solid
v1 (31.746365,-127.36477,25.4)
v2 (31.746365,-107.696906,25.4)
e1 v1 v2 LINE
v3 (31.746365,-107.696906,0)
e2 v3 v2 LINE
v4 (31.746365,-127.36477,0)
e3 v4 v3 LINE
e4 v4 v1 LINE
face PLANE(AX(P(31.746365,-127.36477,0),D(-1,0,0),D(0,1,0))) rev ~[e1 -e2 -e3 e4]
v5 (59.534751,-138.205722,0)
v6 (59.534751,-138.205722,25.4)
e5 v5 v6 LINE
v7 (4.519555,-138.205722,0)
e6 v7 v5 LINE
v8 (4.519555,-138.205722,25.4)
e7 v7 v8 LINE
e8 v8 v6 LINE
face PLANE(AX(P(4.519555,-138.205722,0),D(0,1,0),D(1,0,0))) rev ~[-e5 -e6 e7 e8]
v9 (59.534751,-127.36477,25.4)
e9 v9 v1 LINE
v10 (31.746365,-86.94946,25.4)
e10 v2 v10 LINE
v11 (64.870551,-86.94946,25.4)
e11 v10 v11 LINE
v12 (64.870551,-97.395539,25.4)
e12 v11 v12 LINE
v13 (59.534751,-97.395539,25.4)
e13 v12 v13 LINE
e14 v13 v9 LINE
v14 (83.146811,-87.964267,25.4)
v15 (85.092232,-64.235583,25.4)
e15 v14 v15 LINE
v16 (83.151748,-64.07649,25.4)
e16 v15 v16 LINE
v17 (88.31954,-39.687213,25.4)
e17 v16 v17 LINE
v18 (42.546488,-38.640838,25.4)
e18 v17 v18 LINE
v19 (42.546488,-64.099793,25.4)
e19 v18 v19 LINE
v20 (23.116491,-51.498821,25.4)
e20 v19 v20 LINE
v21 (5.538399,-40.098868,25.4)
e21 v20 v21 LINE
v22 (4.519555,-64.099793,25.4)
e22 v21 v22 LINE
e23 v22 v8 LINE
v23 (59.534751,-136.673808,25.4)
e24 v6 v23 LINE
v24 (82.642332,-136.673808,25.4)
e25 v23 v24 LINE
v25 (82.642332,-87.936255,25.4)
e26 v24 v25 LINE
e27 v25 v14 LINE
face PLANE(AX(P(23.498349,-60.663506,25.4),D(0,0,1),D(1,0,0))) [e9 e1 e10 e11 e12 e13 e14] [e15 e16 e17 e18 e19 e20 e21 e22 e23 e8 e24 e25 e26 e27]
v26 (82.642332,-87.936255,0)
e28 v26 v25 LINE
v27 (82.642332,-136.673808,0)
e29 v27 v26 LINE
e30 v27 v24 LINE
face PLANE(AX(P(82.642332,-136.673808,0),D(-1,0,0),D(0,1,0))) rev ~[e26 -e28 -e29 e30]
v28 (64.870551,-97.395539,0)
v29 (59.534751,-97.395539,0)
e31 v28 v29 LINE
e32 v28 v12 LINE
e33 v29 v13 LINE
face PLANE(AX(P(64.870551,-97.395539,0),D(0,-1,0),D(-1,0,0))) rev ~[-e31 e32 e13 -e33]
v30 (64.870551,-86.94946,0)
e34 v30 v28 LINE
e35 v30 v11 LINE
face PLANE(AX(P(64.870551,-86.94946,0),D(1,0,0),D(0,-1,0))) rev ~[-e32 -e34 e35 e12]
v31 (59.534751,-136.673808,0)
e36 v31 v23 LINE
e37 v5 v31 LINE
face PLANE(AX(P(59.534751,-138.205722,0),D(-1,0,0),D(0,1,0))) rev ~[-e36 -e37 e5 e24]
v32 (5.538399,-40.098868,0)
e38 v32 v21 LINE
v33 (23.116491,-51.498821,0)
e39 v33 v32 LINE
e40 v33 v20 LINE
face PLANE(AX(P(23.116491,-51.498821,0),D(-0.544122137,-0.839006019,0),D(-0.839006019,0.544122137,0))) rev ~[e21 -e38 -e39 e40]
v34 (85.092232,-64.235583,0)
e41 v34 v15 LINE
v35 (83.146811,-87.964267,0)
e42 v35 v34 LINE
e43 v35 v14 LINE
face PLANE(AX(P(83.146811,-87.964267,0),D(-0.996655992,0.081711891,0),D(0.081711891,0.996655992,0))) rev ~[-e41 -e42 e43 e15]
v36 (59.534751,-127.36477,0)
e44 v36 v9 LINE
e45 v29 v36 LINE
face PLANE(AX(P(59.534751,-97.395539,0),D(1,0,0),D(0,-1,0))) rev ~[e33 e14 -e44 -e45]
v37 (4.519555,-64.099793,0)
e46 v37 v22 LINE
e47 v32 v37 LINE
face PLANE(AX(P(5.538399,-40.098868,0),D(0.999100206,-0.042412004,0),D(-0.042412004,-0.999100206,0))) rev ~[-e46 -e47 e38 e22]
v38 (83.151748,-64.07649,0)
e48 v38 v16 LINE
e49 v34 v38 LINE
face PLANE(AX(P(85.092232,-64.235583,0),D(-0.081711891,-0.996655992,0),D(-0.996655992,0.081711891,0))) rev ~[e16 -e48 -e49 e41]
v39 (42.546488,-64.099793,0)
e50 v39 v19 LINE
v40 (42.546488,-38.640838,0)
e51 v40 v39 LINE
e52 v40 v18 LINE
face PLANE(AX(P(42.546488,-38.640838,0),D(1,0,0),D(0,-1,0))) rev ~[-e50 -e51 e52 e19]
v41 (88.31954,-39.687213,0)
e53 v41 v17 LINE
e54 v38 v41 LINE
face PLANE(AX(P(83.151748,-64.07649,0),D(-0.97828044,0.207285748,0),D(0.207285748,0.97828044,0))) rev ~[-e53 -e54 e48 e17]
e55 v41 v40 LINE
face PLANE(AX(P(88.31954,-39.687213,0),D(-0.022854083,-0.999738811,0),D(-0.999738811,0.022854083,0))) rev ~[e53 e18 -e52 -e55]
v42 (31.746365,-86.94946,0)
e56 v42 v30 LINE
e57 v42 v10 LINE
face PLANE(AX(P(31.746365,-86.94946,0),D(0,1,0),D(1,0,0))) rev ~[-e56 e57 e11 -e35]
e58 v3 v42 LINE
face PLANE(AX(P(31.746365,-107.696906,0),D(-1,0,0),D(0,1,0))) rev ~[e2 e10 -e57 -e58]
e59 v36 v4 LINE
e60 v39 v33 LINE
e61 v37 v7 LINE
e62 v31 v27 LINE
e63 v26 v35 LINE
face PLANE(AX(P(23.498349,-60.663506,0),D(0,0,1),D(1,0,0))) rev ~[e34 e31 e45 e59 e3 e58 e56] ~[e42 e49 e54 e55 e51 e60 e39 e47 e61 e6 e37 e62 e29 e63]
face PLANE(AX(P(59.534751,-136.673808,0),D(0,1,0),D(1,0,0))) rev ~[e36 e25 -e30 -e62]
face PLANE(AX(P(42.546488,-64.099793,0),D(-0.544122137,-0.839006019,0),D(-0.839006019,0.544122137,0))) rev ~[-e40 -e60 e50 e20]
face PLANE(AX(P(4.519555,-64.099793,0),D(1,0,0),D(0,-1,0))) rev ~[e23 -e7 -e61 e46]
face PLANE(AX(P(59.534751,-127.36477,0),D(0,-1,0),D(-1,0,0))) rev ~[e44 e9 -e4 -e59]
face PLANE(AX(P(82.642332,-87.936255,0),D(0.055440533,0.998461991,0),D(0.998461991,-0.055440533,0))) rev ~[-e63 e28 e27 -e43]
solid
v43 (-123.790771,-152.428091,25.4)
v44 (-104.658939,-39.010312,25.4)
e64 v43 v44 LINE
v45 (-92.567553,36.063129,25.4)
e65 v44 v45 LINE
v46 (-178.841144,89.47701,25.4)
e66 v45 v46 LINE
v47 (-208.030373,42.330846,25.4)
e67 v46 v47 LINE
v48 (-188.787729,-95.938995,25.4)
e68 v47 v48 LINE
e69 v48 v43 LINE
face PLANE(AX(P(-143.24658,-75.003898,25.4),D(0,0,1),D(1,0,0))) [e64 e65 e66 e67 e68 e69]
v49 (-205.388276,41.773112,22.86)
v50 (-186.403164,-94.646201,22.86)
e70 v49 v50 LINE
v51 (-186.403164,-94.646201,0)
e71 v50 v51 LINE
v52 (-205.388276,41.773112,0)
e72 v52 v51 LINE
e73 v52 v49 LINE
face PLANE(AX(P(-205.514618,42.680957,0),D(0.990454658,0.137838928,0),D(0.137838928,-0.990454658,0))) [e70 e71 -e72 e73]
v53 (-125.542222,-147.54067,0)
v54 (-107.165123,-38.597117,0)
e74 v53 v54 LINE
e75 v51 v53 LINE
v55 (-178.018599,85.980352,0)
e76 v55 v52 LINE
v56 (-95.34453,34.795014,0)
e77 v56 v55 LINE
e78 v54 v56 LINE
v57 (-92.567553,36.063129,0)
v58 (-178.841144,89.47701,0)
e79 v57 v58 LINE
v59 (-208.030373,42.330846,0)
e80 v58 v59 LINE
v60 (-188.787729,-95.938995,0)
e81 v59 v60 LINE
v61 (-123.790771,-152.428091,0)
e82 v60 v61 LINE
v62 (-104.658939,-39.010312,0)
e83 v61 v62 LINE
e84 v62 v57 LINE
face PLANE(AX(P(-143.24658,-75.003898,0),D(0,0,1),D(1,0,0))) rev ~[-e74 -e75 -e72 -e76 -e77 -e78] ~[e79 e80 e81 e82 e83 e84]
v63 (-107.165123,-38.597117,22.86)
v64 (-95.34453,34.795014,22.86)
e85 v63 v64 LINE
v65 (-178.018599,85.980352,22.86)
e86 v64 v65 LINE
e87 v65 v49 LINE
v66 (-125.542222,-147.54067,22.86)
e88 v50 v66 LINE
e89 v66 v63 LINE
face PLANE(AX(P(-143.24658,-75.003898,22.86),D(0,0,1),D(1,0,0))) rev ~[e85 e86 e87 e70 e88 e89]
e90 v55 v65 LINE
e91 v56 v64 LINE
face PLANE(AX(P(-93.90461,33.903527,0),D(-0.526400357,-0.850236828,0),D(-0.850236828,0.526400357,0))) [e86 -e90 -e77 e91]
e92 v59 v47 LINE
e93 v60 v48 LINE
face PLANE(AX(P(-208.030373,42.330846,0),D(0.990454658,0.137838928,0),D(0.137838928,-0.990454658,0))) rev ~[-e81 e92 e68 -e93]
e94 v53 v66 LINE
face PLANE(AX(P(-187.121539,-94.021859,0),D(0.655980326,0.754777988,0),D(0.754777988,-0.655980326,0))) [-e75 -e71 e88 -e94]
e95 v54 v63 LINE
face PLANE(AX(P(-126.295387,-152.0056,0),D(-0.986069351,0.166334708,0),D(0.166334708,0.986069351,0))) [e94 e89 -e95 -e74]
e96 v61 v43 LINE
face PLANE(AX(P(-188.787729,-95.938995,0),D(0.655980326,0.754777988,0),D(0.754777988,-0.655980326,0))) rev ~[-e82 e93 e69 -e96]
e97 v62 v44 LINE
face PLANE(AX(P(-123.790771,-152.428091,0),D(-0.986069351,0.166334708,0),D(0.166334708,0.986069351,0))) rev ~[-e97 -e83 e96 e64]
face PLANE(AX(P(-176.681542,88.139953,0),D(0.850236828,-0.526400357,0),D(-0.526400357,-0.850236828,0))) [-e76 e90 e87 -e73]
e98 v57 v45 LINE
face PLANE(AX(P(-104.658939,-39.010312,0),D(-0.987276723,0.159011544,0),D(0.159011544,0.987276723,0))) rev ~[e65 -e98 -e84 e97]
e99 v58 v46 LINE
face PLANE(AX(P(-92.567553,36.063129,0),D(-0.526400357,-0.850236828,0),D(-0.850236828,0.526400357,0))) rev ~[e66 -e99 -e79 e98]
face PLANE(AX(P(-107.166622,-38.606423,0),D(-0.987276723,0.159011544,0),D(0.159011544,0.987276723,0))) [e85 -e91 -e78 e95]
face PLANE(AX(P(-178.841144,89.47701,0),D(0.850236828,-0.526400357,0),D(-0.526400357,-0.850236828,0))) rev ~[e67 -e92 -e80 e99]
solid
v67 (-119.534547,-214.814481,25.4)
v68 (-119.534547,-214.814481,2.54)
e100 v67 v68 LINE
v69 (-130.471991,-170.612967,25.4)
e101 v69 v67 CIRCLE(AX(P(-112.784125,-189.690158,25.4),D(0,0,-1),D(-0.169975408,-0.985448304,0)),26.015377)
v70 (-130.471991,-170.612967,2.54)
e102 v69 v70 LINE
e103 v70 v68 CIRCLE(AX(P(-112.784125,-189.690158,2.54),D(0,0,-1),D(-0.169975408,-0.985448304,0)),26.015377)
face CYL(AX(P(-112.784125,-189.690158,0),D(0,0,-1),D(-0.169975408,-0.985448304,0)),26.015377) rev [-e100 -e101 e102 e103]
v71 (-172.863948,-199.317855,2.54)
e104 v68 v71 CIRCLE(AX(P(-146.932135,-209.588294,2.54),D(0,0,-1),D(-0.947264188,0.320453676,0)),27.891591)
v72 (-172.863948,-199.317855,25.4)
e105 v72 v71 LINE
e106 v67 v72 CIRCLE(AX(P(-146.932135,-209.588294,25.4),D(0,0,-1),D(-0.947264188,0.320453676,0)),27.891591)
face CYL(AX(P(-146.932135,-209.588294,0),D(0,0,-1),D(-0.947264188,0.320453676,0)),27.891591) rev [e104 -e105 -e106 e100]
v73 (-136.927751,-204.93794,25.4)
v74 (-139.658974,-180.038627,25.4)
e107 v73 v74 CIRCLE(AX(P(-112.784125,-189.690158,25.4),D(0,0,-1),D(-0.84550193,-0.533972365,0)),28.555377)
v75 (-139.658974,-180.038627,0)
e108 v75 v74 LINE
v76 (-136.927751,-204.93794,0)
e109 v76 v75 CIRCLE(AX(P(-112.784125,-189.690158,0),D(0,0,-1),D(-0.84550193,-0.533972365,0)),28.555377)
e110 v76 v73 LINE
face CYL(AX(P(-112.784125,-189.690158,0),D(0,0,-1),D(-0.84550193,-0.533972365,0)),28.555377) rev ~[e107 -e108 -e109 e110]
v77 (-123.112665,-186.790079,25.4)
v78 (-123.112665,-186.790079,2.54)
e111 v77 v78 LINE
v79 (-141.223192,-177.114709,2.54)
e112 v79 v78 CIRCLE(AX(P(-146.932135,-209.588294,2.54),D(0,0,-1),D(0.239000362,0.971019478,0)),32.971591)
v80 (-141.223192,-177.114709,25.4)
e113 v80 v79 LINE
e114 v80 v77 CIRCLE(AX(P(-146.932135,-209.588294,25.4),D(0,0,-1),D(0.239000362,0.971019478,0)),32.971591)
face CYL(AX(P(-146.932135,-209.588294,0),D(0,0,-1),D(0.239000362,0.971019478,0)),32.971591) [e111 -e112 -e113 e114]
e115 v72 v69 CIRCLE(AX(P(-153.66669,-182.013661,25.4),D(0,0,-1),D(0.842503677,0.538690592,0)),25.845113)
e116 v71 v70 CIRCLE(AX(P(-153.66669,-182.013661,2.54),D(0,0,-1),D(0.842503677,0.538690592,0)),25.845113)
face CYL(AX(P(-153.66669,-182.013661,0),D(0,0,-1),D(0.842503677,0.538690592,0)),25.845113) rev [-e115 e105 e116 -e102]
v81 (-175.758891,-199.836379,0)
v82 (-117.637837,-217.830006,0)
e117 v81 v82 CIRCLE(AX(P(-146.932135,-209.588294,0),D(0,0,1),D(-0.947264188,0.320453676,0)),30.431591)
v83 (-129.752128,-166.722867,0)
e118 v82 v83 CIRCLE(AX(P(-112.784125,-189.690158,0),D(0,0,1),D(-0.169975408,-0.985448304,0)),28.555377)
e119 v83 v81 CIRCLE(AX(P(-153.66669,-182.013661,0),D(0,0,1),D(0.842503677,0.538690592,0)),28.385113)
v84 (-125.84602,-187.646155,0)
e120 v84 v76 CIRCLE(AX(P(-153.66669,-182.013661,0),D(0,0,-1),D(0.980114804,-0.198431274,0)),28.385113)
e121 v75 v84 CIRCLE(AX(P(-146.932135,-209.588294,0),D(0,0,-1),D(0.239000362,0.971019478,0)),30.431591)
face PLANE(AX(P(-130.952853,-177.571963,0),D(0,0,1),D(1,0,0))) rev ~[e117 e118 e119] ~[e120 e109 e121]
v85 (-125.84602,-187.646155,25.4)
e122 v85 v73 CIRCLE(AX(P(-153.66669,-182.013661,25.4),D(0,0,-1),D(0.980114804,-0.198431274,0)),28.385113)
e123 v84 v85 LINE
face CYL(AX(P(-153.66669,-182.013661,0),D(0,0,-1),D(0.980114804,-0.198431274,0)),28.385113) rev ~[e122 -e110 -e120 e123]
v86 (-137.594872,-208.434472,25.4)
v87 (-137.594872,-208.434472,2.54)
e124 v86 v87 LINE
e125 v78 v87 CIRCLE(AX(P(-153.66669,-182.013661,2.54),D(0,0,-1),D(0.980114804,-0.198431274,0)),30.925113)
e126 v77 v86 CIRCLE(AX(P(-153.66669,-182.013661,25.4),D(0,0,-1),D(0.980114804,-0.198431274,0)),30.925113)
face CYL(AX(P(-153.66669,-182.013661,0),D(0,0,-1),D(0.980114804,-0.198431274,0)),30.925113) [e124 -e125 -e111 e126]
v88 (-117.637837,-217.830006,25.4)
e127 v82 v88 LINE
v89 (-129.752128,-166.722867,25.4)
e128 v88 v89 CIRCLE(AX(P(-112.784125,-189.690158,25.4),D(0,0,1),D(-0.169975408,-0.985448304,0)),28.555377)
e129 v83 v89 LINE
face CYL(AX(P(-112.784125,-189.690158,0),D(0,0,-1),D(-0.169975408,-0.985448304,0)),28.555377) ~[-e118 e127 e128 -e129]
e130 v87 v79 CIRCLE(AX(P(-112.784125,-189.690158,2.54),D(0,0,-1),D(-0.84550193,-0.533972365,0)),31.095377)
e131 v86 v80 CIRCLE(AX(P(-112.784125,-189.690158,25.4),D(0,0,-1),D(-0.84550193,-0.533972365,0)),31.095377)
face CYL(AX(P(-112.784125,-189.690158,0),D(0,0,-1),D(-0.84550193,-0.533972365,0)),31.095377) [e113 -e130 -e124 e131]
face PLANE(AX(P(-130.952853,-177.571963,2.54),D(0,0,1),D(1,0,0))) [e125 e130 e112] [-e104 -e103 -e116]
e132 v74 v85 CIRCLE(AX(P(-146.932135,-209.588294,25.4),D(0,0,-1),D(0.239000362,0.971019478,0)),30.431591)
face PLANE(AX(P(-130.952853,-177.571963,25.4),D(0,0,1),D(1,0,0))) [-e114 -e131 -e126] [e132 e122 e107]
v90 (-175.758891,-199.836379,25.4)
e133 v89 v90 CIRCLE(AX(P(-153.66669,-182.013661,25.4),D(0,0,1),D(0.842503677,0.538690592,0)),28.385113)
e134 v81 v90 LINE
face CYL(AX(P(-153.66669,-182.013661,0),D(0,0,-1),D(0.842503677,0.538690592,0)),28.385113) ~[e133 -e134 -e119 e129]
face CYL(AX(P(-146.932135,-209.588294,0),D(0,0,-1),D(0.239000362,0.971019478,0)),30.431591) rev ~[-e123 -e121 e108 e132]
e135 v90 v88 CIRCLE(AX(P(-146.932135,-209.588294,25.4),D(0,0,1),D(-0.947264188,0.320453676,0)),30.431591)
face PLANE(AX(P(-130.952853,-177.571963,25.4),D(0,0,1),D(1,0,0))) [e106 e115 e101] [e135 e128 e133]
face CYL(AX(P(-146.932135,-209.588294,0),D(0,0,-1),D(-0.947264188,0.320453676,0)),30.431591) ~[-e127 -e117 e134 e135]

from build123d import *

# Parameters (mm, degrees)
F1_DEPTH = 25.4
F3_DEPTH = 25.4
F4_T     = -2.54
F5_W     = 27.2268103436
F5_H     = 10.8409523964
F5_W_2   = 23.1075808406
F5_H_2   = 9.3090385199
F5_H_3   = 6.7053586245
F5_H_4   = 12.9625052214
F6_DEPTH = 25.4
F7_T     = -2.54


# Not quite as in the source:
# - ends of sketch curves that miss each other by under 0.0002 mm in the source are joined


with BuildPart() as f1:
    # F0 (on Top) → F1 (new body)
    with BuildSketch(Plane.XY):
        Polygon((-156.3564315383, 1.9787269735), (-188.787728548, -95.9389954805), (-123.7907707691, -152.4280905724), (-104.6589389443, -39.0103124082), (-155.8479517698, 0), align=None)
        Polygon((-208.030372858, 42.3308461905), (-188.787728548, -95.9389954805), (-156.3564315383, 1.9787269735), (-178.8411438465, 89.4770100713), align=None)
        Polygon((-178.8411438465, 89.4770100713), (-156.3564315383, 1.9787269735), (-155.8479517698, 0), (-104.6589389443, -39.0103124082), (-92.5675530585, 36.0631288163), align=None)
    extrude(amount=F1_DEPTH)

    # F4
    f4_openings = [f1.faces().sort_by_distance(p)[0] for p in [
        (-151.431533, -21.743428, 0),
    ]]
    offset(amount=F4_T, openings=f4_openings)


with BuildPart() as f3:
    # F2 (on Top) → F3 (new body)
    with BuildSketch(Plane.XY):
        with BuildLine():
            ThreePointArc((-125.8460203447, -187.6461548391), (-125.4230402026, -184.8440134333), (-125.2815768128, -182.0136606693))
            ThreePointArc((-125.2815768128, -182.0136606693), (-126.4221290125, -174.0482010322), (-129.7521277548, -166.7228672564))
            ThreePointArc((-129.7521277548, -166.7228672564), (-135.6943033651, -172.6451210363), (-139.658973853, -180.0386268854))
            ThreePointArc((-139.658973853, -180.0386268854), (-132.2511693873, -182.9321324426), (-125.8460203447, -187.6461548391))
        make_face()
        with BuildLine():
            ThreePointArc((-129.7521277548, -166.7228672564), (-126.4221290125, -174.0482010322), (-125.2815768128, -182.0136606693))
            ThreePointArc((-125.2815768128, -182.0136606693), (-125.4230402026, -184.8440134333), (-125.8460203447, -187.6461548391))
            ThreePointArc((-125.8460203447, -187.6461548391), (-118.9342268143, -197.6635782995), (-116.5005442713, -209.5882943076))
            ThreePointArc((-116.5005442713, -209.5882943076), (-116.7862081683, -213.7481993276), (-117.637836757, -217.8300055925))
            ThreePointArc((-117.637836757, -217.8300055925), (-94.3883375859, -211.5305918967), (-84.2287479373, -189.6901577711))
            ThreePointArc((-84.2287479373, -189.6901577711), (-99.9217410648, -164.1956753112), (-129.7521277548, -166.7228672564))
        make_face()
        with BuildLine():
            ThreePointArc((-139.658973853, -180.0386268854), (-135.6943033651, -172.6451210363), (-129.7521277548, -166.7228672564))
            ThreePointArc((-129.7521277548, -166.7228672564), (-170.2484998371, -158.9754699319), (-175.7588912266, -199.8363791712))
            ThreePointArc((-175.7588912266, -199.8363791712), (-161.5652178843, -182.9058167896), (-139.658973853, -180.0386268854))
        make_face()
        with BuildLine():
            ThreePointArc((-116.5005442713, -209.5882943076), (-118.9342268143, -197.6635782995), (-125.8460203447, -187.6461548391))
            ThreePointArc((-125.8460203447, -187.6461548391), (-129.7681307705, -197.3294537383), (-136.9277512541, -204.9379399409))
            ThreePointArc((-136.9277512541, -204.9379399409), (-128.6511581783, -213.4314047769), (-117.637836757, -217.8300055925))
            ThreePointArc((-117.637836757, -217.8300055925), (-116.7862081683, -213.7481993276), (-116.5005442713, -209.5882943076))
        make_face()
        with BuildLine():
            ThreePointArc((-139.658973853, -180.0386268854), (-161.5652178843, -182.9058167896), (-175.7588912266, -199.8363791712))
            ThreePointArc((-175.7588912266, -199.8363791712), (-157.3640992757, -210.1569336627), (-136.9277512541, -204.9379399409))
            ThreePointArc((-136.9277512541, -204.9379399409), (-141.1692469428, -192.8037411296), (-139.658973853, -180.0386268854))
        make_face()
        with BuildLine():
            ThreePointArc((-136.9277512541, -204.9379399409), (-157.3640992757, -210.1569336627), (-175.7588912266, -199.8363791712))
            ThreePointArc((-175.7588912266, -199.8363791712), (-155.9319849015, -238.6586300828), (-117.637836757, -217.8300055925))
            ThreePointArc((-117.637836757, -217.8300055925), (-128.6511581783, -213.4314047769), (-136.9277512541, -204.9379399409))
        make_face()
    extrude(amount=F3_DEPTH)

    # F7
    f7_openings = [f3.faces().sort_by_distance(p)[0] for p in [
        (-169.486097, -160.034726, 25.4),
    ]]
    offset(amount=F7_T, openings=f7_openings, kind=Kind.INTERSECTION)


with BuildPart() as f6:
    # F5 (on Top) → F6 (new body)
    with BuildSketch(Plane.XY):
        Polygon((4.5195547864, -64.0997934229), (42.5464881825, -64.0997934229), (23.116490582, -51.49882088), align=None)
        Polygon((4.5195547864, -97.3955392838), (31.7463651299, -97.3955392838), (31.7463651299, -86.9494602084), align=None)
        Polygon((5.5383988656, -40.0988683105), (4.5195547864, -64.0997934229), (23.116490582, -51.49882088), align=None)
        Polygon((59.5347508788, -62.1402259879), (42.5464881825, -64.0997934229), (83.1468105316, -64.0997934229), (83.1517481659, -64.0764903684), align=None)
        with Locations((18.1329599582, -132.7852457762)):
            Rectangle(F5_W, F5_H)
        Polygon((64.8705512285, -97.3955392838), (82.6423317194, -97.3955392838), (64.8705512285, -86.9494602084), align=None)
        Polygon((59.5347508788, -107.6969057322), (82.6423317194, -107.6969057322), (82.6423317194, -97.3955392838), (64.8705512285, -97.3955392838), (59.5347508788, -97.3955392838), align=None)
        Polygon((59.5347508788, -136.6738080978), (59.5347508788, -127.364769578), (31.7463651299, -127.364769578), (31.7463651299, -138.2057219744), (59.5347508788, -138.2057219744), align=None)
        with Locations((71.0885412991, -132.0192888379)):
            Rectangle(F5_W_2, F5_H_2)
        with Locations((18.1329599582, -124.0120902658)):
            Rectangle(F5_W, F5_H_3)
        Polygon((64.8705512285, -86.9494602084), (82.6423317194, -97.3955392838), (82.6423317194, -87.9362548824), align=None)
        with Locations((71.0885412991, -114.1781583428)):
            Rectangle(F5_W_2, F5_H_4)
        with Locations((71.0885412991, -124.0120902658)):
            Rectangle(F5_W_2, F5_H_3)
        Polygon((82.6423317194, -87.6677388178), (82.6423317194, -87.9362548824), (83.1468105316, -87.9642665386), align=None)
        Polygon((4.5195547864, -107.6969057322), (31.7463651299, -107.6969057322), (31.7463651299, -97.3955392838), (4.5195547864, -97.3955392838), (4.5195547864, -102.546222508), align=None)
        with Locations((18.1329599582, -114.1781583428)):
            Rectangle(F5_W, F5_H_4)
        Polygon((42.5464881825, -64.0997934229), (82.6423317194, -87.6677388178), (83.1468105316, -87.9642665386), (85.0922316313, -64.2355829477), (83.1517481659, -64.0764903684), (83.1468105316, -64.0997934229), align=None)
        Polygon((4.5195547864, -86.9494602084), (6.1366017055, -86.9494602084), (42.5464881825, -64.0997934229), (4.5195547864, -64.0997934229), align=None)
        Polygon((31.7463651299, -86.9494602084), (64.8705512285, -86.9494602084), (82.6423317194, -87.9362548824), (82.6423317194, -87.6677388178), (42.5464881825, -64.0997934229), (6.1366017055, -86.9494602084), align=None)
        Polygon((4.5195547864, -87.9642665386), (6.1366017055, -86.9494602084), (4.5195547864, -86.9494602084), align=None)
        Polygon((4.5195547864, -97.3955392838), (31.7463651299, -86.9494602084), (6.1366017055, -86.9494602084), (4.5195547864, -87.9642665386), align=None)
        Polygon((42.5464881825, -38.6408381164), (42.5464881825, -64.0997934229), (59.5347508788, -62.1402259879), (83.1517481659, -64.0764903684), (88.3195400238, -39.6872125566), align=None)
    extrude(amount=F6_DEPTH)


solid = Compound([f1.part, f3.part, f6.part])
